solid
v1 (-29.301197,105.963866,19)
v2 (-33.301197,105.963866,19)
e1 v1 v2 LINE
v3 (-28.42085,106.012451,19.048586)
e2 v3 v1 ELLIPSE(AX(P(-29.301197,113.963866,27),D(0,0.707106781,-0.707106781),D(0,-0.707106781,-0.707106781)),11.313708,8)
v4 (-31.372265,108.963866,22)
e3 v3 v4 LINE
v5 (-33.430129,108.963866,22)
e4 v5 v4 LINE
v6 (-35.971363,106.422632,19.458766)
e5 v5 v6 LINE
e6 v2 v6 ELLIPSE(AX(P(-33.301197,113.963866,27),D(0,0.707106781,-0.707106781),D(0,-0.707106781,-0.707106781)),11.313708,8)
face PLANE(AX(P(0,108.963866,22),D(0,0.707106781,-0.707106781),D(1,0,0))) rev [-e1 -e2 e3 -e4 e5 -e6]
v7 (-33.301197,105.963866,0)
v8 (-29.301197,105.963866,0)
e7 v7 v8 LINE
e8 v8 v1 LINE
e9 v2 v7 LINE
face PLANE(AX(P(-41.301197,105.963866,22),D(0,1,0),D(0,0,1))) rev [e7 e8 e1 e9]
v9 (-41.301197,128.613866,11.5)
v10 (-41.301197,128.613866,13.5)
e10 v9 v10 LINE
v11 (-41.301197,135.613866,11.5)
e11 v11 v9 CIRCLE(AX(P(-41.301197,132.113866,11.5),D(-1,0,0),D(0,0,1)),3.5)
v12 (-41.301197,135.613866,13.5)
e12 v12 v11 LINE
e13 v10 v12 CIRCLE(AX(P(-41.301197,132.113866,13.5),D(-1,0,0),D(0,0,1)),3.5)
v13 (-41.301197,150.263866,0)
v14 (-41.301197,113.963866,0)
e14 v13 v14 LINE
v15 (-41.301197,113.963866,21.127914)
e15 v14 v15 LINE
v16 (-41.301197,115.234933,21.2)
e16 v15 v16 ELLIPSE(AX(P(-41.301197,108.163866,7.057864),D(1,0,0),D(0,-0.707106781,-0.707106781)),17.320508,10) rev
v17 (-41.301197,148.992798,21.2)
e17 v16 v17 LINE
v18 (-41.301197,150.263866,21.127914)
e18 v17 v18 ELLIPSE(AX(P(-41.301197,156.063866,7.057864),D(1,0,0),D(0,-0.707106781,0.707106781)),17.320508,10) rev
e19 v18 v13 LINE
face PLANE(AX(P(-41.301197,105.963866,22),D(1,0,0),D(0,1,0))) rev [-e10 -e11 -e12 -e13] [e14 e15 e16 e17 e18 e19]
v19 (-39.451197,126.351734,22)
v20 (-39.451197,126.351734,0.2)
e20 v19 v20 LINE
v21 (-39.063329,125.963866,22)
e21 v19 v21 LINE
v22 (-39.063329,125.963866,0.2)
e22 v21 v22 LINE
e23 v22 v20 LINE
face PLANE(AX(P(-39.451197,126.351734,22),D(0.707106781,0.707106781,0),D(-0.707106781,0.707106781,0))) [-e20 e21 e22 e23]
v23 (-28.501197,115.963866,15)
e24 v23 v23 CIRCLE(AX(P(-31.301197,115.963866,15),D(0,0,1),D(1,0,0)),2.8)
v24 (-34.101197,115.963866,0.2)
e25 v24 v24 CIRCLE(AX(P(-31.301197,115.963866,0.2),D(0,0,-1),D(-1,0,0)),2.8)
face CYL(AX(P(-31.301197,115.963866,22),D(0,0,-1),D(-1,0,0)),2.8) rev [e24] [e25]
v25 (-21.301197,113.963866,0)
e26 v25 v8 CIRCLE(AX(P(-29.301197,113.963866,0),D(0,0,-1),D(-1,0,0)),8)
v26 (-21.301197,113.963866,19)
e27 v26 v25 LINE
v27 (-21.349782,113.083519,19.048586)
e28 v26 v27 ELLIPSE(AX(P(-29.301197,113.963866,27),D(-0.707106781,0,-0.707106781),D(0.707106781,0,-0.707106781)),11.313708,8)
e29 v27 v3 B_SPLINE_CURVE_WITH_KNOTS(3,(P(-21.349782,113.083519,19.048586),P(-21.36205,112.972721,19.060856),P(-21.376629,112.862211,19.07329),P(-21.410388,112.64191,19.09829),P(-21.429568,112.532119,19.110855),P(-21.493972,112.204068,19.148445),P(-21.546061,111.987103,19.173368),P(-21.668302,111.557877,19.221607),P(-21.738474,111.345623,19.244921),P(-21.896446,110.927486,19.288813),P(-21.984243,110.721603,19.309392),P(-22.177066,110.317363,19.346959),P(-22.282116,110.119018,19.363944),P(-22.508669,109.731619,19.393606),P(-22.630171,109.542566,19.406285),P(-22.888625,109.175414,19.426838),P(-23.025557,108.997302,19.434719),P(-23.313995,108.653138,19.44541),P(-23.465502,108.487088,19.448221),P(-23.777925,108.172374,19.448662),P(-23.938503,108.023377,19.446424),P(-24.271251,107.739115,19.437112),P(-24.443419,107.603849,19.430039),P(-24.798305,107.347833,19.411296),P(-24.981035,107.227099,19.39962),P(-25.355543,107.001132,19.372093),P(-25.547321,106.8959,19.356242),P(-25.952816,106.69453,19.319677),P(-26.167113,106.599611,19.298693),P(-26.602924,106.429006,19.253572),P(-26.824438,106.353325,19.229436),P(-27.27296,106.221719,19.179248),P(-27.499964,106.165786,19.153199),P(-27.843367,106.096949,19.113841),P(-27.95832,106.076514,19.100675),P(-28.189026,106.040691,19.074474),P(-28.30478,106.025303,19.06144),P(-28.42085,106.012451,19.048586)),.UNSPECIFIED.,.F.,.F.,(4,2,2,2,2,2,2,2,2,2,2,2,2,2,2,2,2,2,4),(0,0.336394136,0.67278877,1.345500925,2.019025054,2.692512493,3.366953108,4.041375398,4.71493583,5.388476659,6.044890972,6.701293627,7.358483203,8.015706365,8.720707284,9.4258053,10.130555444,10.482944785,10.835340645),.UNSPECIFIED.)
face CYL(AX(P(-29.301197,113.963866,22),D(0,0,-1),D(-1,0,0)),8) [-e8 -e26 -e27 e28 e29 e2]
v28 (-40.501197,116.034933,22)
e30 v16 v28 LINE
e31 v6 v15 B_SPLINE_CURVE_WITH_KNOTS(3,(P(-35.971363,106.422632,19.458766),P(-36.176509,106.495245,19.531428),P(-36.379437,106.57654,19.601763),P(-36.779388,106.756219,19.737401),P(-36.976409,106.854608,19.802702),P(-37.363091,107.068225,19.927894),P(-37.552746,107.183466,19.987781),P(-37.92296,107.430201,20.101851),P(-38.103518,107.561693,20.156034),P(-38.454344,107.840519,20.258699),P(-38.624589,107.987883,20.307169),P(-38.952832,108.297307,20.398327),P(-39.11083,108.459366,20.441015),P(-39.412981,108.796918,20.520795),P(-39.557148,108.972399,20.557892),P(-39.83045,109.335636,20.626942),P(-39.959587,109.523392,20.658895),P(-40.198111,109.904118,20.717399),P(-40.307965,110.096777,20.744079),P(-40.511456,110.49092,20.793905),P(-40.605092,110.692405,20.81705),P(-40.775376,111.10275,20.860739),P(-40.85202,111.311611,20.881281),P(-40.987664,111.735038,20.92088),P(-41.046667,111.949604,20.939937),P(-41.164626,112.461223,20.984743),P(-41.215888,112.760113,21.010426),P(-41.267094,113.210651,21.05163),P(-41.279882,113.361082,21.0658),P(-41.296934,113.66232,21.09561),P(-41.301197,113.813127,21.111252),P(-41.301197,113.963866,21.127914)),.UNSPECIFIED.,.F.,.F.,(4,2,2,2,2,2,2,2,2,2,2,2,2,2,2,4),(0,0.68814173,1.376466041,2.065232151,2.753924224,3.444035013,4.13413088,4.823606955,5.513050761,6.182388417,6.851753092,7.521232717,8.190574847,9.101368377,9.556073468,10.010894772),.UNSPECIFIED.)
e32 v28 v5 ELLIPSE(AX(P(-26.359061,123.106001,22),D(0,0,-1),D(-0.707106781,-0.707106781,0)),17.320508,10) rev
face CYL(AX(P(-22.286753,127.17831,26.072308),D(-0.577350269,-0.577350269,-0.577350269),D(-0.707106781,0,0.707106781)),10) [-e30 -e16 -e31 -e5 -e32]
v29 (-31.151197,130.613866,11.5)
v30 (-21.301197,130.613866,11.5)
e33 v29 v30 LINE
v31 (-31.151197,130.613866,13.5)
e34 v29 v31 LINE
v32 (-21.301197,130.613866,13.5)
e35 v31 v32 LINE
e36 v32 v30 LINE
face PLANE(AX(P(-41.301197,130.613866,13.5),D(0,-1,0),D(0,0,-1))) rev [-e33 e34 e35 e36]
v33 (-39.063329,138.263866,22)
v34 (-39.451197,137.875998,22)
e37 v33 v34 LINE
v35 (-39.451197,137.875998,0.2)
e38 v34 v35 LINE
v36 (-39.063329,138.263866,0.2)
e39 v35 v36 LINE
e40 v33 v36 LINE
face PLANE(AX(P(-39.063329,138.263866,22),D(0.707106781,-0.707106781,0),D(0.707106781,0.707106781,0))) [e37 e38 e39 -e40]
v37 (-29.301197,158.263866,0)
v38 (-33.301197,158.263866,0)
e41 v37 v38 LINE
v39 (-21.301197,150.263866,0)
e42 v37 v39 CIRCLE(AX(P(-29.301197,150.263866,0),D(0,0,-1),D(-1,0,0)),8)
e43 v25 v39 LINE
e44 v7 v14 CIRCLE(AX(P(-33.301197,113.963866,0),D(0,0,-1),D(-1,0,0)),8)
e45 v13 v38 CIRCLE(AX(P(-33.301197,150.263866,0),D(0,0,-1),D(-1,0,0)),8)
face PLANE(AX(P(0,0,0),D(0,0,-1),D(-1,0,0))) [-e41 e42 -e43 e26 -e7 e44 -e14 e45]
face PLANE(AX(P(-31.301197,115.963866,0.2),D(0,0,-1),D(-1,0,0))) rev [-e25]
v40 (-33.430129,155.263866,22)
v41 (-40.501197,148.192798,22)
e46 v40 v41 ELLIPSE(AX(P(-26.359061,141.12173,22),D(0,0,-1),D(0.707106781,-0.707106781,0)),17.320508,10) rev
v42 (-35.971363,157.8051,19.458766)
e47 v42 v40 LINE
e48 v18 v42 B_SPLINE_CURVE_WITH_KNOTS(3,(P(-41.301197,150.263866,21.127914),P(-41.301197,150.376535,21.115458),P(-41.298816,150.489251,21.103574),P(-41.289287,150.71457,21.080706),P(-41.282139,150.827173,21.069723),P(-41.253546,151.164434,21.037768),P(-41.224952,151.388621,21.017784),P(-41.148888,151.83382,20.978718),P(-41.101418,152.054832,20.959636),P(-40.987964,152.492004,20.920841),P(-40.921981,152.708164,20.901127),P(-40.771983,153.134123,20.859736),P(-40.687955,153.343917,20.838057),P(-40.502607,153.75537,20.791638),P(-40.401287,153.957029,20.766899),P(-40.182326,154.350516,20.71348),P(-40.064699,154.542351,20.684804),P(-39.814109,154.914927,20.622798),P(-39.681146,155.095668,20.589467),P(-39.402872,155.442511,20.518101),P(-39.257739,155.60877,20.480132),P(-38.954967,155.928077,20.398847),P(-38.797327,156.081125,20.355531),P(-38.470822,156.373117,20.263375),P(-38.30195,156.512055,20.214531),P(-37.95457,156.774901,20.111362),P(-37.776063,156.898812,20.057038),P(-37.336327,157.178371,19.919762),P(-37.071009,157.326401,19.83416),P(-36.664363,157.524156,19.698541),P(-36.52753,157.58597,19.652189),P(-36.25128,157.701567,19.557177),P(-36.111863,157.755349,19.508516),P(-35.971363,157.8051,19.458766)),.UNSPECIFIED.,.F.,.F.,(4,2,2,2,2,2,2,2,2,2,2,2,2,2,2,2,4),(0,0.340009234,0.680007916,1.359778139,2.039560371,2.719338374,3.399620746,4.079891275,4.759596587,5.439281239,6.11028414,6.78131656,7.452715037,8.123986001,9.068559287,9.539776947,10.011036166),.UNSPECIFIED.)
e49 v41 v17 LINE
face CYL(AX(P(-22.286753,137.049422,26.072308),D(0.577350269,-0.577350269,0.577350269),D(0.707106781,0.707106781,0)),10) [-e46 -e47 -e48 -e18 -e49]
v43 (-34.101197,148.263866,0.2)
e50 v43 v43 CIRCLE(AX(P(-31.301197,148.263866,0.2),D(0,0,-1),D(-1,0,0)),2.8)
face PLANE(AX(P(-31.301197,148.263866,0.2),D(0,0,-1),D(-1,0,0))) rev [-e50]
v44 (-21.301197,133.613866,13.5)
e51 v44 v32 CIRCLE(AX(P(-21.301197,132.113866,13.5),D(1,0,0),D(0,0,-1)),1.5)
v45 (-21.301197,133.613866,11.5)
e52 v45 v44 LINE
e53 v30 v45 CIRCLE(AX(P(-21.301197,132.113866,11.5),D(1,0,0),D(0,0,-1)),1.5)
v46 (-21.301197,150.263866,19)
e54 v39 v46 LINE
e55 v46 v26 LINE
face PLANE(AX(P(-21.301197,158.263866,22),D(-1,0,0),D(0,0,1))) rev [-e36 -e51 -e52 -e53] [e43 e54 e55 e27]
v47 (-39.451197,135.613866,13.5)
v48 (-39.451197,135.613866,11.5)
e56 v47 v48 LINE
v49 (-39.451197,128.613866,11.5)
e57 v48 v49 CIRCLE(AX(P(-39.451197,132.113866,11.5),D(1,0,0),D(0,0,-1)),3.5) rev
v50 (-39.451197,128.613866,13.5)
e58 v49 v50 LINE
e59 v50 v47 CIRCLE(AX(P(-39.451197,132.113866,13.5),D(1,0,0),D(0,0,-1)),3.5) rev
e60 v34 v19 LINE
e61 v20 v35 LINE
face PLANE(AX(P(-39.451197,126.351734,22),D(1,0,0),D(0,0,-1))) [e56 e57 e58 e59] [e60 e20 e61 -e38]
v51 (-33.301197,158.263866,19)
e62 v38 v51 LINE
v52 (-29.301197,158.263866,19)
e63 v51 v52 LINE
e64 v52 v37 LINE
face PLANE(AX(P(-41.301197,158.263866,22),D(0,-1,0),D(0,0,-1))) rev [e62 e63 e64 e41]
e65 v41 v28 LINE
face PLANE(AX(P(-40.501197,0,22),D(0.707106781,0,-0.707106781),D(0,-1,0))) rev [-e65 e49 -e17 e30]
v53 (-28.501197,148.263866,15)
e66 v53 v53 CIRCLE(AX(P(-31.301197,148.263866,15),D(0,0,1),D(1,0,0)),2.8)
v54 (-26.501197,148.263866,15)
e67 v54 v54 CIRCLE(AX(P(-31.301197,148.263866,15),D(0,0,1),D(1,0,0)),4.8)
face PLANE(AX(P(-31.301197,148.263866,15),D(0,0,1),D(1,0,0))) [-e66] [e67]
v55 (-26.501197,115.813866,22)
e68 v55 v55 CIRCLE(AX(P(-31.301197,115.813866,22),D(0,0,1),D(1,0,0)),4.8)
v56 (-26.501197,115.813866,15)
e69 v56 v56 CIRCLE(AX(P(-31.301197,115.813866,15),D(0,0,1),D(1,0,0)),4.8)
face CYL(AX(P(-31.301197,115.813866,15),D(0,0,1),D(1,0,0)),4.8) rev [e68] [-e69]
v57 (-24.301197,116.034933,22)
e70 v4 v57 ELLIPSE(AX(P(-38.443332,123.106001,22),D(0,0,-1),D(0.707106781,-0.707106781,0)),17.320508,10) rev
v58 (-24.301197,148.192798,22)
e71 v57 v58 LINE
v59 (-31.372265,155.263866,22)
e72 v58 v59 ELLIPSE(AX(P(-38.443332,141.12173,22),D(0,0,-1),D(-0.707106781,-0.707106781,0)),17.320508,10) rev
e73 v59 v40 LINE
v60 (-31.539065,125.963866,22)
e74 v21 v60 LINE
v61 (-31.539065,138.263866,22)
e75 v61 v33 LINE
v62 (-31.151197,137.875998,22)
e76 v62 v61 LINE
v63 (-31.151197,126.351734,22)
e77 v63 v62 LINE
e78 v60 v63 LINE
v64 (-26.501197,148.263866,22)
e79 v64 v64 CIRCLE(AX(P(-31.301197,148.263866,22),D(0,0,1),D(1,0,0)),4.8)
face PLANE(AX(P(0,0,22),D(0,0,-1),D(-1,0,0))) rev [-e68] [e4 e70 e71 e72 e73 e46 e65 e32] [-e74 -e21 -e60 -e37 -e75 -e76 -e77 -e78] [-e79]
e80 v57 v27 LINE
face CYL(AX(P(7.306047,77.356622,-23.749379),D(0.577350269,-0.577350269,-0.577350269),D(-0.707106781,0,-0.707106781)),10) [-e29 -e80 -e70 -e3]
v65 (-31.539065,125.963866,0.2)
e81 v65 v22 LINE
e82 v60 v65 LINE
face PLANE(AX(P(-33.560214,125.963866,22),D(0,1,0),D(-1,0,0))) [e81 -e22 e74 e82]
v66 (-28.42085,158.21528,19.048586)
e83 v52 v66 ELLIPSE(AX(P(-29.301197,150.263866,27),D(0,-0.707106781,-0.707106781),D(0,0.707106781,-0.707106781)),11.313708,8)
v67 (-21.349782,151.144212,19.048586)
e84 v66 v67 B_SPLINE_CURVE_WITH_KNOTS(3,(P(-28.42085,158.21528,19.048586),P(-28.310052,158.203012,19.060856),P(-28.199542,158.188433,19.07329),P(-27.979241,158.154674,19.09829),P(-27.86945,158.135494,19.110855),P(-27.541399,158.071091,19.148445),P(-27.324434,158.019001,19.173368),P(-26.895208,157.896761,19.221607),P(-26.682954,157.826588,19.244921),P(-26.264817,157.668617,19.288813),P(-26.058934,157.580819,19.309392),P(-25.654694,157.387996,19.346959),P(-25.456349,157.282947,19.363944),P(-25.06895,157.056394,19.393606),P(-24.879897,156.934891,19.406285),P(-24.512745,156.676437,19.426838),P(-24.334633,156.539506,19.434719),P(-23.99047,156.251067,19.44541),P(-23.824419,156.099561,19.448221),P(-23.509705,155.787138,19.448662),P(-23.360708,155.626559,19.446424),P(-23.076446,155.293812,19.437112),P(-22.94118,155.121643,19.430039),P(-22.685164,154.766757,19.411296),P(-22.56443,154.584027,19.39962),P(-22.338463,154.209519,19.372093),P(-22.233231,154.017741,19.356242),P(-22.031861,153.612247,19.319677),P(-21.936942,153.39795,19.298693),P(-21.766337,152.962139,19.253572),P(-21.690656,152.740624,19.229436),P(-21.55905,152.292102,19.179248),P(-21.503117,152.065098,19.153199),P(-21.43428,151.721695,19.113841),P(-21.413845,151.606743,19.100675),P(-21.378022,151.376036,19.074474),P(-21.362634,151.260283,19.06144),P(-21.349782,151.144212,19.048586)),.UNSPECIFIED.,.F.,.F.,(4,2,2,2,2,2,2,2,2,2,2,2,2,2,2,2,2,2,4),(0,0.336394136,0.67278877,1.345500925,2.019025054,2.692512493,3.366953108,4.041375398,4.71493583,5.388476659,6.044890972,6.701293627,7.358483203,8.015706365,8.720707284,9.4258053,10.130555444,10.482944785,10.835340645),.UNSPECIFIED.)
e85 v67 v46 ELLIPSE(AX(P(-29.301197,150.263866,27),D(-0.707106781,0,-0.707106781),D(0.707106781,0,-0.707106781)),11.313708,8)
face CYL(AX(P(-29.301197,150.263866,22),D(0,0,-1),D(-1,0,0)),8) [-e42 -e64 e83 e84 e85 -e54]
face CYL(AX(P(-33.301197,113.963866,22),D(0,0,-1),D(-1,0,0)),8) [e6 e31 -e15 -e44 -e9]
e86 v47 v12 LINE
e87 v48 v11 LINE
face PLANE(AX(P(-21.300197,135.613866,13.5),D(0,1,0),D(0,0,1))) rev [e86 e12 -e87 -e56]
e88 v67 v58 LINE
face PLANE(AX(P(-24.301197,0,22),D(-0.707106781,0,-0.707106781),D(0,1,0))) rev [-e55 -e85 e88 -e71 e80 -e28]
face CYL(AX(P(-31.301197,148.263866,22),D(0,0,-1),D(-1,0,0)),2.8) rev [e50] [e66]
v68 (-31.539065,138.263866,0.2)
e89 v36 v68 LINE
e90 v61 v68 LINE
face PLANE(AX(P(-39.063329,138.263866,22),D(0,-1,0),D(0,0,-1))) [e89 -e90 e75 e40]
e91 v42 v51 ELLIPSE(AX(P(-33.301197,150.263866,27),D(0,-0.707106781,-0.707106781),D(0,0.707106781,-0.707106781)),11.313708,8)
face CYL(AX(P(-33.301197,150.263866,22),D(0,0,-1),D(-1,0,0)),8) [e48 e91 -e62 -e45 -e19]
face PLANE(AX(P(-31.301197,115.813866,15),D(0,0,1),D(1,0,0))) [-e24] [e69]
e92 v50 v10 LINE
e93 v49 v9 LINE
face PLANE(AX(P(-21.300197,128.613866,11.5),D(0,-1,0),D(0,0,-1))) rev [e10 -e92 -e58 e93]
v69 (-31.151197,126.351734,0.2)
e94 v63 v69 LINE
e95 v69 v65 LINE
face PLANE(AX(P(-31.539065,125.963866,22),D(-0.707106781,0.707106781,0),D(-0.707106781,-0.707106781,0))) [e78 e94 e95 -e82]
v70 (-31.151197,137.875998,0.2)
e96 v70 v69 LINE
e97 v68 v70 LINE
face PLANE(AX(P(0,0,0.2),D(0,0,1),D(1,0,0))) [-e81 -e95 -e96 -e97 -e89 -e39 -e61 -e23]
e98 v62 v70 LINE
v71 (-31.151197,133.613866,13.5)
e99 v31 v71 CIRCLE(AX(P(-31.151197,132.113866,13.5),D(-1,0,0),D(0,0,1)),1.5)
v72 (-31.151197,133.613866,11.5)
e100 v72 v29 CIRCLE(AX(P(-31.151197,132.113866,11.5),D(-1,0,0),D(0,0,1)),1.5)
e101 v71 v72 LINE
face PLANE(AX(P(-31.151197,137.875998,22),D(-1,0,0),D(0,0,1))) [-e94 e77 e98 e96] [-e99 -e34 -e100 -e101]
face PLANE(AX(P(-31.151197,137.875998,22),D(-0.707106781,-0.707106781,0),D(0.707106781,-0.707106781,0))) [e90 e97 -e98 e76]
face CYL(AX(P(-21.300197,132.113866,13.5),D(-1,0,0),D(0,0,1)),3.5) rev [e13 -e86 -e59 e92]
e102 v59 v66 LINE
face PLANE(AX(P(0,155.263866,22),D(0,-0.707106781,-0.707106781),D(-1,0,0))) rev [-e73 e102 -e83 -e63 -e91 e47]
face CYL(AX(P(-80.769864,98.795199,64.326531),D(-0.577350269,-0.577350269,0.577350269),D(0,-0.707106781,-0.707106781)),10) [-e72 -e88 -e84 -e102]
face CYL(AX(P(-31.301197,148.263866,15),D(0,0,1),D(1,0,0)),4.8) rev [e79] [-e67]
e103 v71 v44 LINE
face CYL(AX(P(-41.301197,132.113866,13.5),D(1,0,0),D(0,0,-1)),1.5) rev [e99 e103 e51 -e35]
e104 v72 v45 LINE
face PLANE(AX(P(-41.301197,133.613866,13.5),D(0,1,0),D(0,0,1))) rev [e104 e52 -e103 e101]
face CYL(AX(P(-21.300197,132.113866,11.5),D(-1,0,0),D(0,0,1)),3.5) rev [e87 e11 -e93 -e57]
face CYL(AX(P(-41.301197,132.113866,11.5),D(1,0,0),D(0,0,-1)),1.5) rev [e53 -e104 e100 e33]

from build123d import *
from build123d.topology import SkipClean

# Parameters (mm, degrees)
SZKIC1_W                        = 20
SZKIC1_H                        = 52.3
SZKIC1_R                        = 2.8
DODANIE_WYCI_GNI_CIE1_DEPTH     = 22
SZKIC2_R                        = 4.8
WYTNIJ_WYCI_GNI_CIE1_DEPTH      = 7
ZAOKR_GLENIE1_R                 = 8
WYTNIJ_WYCI_GNI_CIE2_DEPTH      = 161.813163879
WYTNIJ_WYCI_GNI_CIE2_DEPTH_BACK = 161.813163879
WYTNIJ_WYCI_GNI_CIE3_REACH      = 163.032
SZKIC7_R                        = 2.8
DODANIE_WYCI_GNI_CIE2_DEPTH     = 0.2
SFAZOWANIE1_SIZE                = 3
SFAZOWANIE2_SIZE                = 3
ZAOKR_GLENIE2_R                 = 10
SFAZOWANIE3_SIZE                = 0.8
ZAOKR_GLENIE3_START             = -102
ZAOKR_GLENIE3_DEPTH             = 6.947286026
ZAOKR_GLENIE3_START_2           = 51
ZAOKR_GLENIE3_2_DEPTH           = 6.499237843


with BuildPart() as part:
    # Szkic1 → Dodanie-wyciągnięcie1 (new body)
    with BuildSketch(Plane.XY):
        with Locations((-31.301196691, 132.11386567)):
            Rectangle(SZKIC1_W, SZKIC1_H)
        with Locations((-31.301196691, 148.26386567)):
            Circle(SZKIC1_R, mode=Mode.SUBTRACT)
        with Locations(Location((-31.301196691, 115.96386567, 0), (0, 0, 180))):
            Circle(SZKIC1_R, mode=Mode.SUBTRACT)
        Polygon((-33.860213685, 125.96386567), (-39.063328725, 125.96386567), (-39.451196691, 126.351733636), (-39.451196691, 137.875997705), (-39.063328725, 138.26386567), (-33.860213685, 138.26386567), (-33.560213685, 138.26386567), (-33.042179696, 138.26386567), (-32.742179696, 138.26386567), (-31.539064656, 138.26386567), (-31.151196691, 137.875997705), (-31.151196691, 126.351733636), (-31.539064656, 125.96386567), (-32.742179696, 125.96386567), (-33.042179696, 125.96386567), (-33.560213685, 125.96386567), align=None, mode=Mode.SUBTRACT)
    extrude(amount=DODANIE_WYCI_GNI_CIE1_DEPTH)

    # Szkic2 → Wytnij-wyciągnięcie1 (cut)
    with BuildSketch(Plane.XY.offset(22)):
        with Locations((-31.301196691, 148.26386567)):
            Circle(SZKIC2_R)
        with Locations((-31.301196691, 115.81386567)):
            Circle(SZKIC2_R)
    extrude(amount=-WYTNIJ_WYCI_GNI_CIE1_DEPTH, mode=Mode.SUBTRACT)

    # Zaokrąglenie1
    zaokr_glenie1_edges = [part.edges().sort_by_distance(p)[0] for p in [
        (-41.301196691, 105.96386567, 11),
        (-41.301196691, 158.26386567, 11),
        (-21.301196691, 158.26386567, 11),
        (-21.301196691, 105.96386567, 11),
    ]]
    fillet(zaokr_glenie1_edges, radius=ZAOKR_GLENIE1_R)

    # Szkic4 → Wytnij-wyciągnięcie2 (cut, two sides: drawn at the far end of the back side and taken through both)
    with BuildSketch(Plane(origin=(-39.451196691, 0, 0), x_dir=(0, 0, -1), z_dir=(1, 0, 0)).offset(-WYTNIJ_WYCI_GNI_CIE2_DEPTH_BACK)):
        with BuildLine():
            Line((-13.5, 133.61386567), (-11.5, 133.61386567))
            ThreePointArc((-11.5, 133.61386567), (-10, 132.11386567), (-11.5, 130.61386567))
            Line((-11.5, 130.61386567), (-13.5, 130.61386567))
            ThreePointArc((-13.5, 130.61386567), (-15, 132.11386567), (-13.5, 133.61386567))
        make_face()
    extrude(amount=WYTNIJ_WYCI_GNI_CIE2_DEPTH + WYTNIJ_WYCI_GNI_CIE2_DEPTH_BACK, mode=Mode.SUBTRACT)

    # Szkic6 → Wytnij-wyciągnięcie3 (cut, up to next)
    with BuildSketch(Plane.ZY.offset(41.301196691), mode=Mode.PRIVATE) as wytnij_wyci_gni_cie3_sk1:
        with BuildLine():
            Line((11.5, 128.61386567), (13.5, 128.61386567))
            ThreePointArc((13.5, 128.61386567), (17, 132.11386567), (13.5, 135.61386567))
            Line((13.5, 135.61386567), (11.5, 135.61386567))
            ThreePointArc((11.5, 135.61386567), (8, 132.11386567), (11.5, 128.61386567))
        make_face()
    wytnij_wyci_gni_cie3_tool1 = extrude(wytnij_wyci_gni_cie3_sk1.sketch, amount=-WYTNIJ_WYCI_GNI_CIE3_REACH, mode=Mode.PRIVATE) & part.part
    add(wytnij_wyci_gni_cie3_tool1.solids().sort_by_distance((-41.301197, 132.113866, 12.5))[0], mode=Mode.SUBTRACT)

    # Szkic7 → Dodanie-wyciągnięcie2 (add)
    with BuildSketch(Plane(origin=(0, 0, 0), x_dir=(-1, 0, 0), z_dir=(0, 0, -1))):
        with Locations((31.301196691, 115.96386567)):
            Circle(SZKIC7_R)
        with Locations((31.301196691, 148.26386567)):
            Circle(SZKIC7_R)
        Polygon((31.539064656, 125.96386567), (31.151196691, 126.351733636), (31.151196691, 137.875997705), (31.539064656, 138.26386567), (39.063328725, 138.26386567), (39.451196691, 137.875997705), (39.451196691, 126.351733636), (39.063328725, 125.96386567), align=None)
    extrude(amount=-DODANIE_WYCI_GNI_CIE2_DEPTH)

    # Sfazowanie1
    # the kernel refuses this chamfer: 3 mm, written as the material it takes off along each edge
    with BuildSketch(Plane(origin=(-21.301196691, 157.978914634, 22), x_dir=(0, 0, -1), z_dir=(0, -1, 0))) as sfazowanie1_piece_1:
        Polygon((SFAZOWANIE1_SIZE, 0), (0, -SFAZOWANIE1_SIZE), (0, 0), align=None)
    extrude(amount=51.730097928, mode=Mode.SUBTRACT)

    # Sfazowanie2
    # the kernel refuses this chamfer: 3 mm, written as the material it takes off along each edge
    with BuildSketch(Plane(origin=(-21.586147727, 105.96386567, 22), x_dir=(0, 1, 0), z_dir=(-1, 0, 0)), Plane(origin=(-41.016245655, 158.26386567, 22), x_dir=(0, -1, 0), z_dir=(1, 0, 0))) as sfazowanie2_piece_1:
        Polygon((SFAZOWANIE2_SIZE, 0), (0, SFAZOWANIE2_SIZE), (0, 0), align=None)
    extrude(amount=19.430097928, mode=Mode.SUBTRACT)

    # Zaokrąglenie2
    zaokr_glenie2_edges = [part.edges().sort_by_distance(p)[0] for p in [
        (-23.972769566, 108.635438546, 21.671572875),
        (-23.972769566, 155.592292795, 21.671572875),
    ]]
    fillet(zaokr_glenie2_edges, radius=ZAOKR_GLENIE2_R)

    # Sfazowanie3
    sfazowanie3_edges = [part.edges().sort_by_distance(p)[0] for p in [
        (-40.849705947, 152.913395441, 22),
        (-40.849705947, 111.3143359, 22),
        (-41.301196691, 132.11386567, 22),
    ]]
    chamfer(sfazowanie3_edges, length=SFAZOWANIE3_SIZE)

    # Zaokrąglenie3: read off the stored shape, not the designer's step
    # Zaokrąglenie3 outline → Zaokrąglenie3 (cut)
    with SkipClean():  # the faces are left unmerged after this step: merging them gives an invalid solid
        with BuildSketch(Plane(origin=(0, 0, 0), x_dir=(0.8164965809277239, 0.4082482904638656, -0.40824829046386485), z_dir=(0.5773502691896288, -0.5773502691896248, 0.5773502691896238)).offset(ZAOKR_GLENIE3_START)):
            with BuildLine():
                ThreePointArc((18.448905373, 120.344481475), (22.109159411, 124.004735513), (27.109159411, 125.344481475))
                Line((27.109159411, 125.344481475), (17, 125.344481475))
                Line((17, 125.344481475), (17, 119))
                Line((17, 119), (17.672668632, 119))
                Line((17.672668632, 119), (18.448905373, 120.344481475))
            make_face()
        extrude(amount=ZAOKR_GLENIE3_DEPTH, mode=Mode.SUBTRACT)

    # Zaokr_glenie3 2 outline → Zaokr_glenie3 2 (cut)
    with BuildSketch(Plane(origin=(0, 0, 0), x_dir=(0.816496580927723, -0.4082482904638645, -0.40824829046386735), z_dir=(0.5773502691896298, 0.5773502691896218, 0.5773502691896258)).offset(ZAOKR_GLENIE3_START_2)):
        with BuildLine():
            Line((-91, 61.492739134), (-80.761360202, 61.492739134))
            ThreePointArc((-80.761360202, 61.492739134), (-85.761360202, 62.832485096), (-89.42161424, 66.492739134))
            Line((-89.42161424, 66.492739134), (-90.291831707, 68))
            Line((-90.291831707, 68), (-91, 68))
            Line((-91, 68), (-91, 61.492739134))
        make_face()
    extrude(amount=ZAOKR_GLENIE3_2_DEPTH, mode=Mode.SUBTRACT)


solid = part.part
